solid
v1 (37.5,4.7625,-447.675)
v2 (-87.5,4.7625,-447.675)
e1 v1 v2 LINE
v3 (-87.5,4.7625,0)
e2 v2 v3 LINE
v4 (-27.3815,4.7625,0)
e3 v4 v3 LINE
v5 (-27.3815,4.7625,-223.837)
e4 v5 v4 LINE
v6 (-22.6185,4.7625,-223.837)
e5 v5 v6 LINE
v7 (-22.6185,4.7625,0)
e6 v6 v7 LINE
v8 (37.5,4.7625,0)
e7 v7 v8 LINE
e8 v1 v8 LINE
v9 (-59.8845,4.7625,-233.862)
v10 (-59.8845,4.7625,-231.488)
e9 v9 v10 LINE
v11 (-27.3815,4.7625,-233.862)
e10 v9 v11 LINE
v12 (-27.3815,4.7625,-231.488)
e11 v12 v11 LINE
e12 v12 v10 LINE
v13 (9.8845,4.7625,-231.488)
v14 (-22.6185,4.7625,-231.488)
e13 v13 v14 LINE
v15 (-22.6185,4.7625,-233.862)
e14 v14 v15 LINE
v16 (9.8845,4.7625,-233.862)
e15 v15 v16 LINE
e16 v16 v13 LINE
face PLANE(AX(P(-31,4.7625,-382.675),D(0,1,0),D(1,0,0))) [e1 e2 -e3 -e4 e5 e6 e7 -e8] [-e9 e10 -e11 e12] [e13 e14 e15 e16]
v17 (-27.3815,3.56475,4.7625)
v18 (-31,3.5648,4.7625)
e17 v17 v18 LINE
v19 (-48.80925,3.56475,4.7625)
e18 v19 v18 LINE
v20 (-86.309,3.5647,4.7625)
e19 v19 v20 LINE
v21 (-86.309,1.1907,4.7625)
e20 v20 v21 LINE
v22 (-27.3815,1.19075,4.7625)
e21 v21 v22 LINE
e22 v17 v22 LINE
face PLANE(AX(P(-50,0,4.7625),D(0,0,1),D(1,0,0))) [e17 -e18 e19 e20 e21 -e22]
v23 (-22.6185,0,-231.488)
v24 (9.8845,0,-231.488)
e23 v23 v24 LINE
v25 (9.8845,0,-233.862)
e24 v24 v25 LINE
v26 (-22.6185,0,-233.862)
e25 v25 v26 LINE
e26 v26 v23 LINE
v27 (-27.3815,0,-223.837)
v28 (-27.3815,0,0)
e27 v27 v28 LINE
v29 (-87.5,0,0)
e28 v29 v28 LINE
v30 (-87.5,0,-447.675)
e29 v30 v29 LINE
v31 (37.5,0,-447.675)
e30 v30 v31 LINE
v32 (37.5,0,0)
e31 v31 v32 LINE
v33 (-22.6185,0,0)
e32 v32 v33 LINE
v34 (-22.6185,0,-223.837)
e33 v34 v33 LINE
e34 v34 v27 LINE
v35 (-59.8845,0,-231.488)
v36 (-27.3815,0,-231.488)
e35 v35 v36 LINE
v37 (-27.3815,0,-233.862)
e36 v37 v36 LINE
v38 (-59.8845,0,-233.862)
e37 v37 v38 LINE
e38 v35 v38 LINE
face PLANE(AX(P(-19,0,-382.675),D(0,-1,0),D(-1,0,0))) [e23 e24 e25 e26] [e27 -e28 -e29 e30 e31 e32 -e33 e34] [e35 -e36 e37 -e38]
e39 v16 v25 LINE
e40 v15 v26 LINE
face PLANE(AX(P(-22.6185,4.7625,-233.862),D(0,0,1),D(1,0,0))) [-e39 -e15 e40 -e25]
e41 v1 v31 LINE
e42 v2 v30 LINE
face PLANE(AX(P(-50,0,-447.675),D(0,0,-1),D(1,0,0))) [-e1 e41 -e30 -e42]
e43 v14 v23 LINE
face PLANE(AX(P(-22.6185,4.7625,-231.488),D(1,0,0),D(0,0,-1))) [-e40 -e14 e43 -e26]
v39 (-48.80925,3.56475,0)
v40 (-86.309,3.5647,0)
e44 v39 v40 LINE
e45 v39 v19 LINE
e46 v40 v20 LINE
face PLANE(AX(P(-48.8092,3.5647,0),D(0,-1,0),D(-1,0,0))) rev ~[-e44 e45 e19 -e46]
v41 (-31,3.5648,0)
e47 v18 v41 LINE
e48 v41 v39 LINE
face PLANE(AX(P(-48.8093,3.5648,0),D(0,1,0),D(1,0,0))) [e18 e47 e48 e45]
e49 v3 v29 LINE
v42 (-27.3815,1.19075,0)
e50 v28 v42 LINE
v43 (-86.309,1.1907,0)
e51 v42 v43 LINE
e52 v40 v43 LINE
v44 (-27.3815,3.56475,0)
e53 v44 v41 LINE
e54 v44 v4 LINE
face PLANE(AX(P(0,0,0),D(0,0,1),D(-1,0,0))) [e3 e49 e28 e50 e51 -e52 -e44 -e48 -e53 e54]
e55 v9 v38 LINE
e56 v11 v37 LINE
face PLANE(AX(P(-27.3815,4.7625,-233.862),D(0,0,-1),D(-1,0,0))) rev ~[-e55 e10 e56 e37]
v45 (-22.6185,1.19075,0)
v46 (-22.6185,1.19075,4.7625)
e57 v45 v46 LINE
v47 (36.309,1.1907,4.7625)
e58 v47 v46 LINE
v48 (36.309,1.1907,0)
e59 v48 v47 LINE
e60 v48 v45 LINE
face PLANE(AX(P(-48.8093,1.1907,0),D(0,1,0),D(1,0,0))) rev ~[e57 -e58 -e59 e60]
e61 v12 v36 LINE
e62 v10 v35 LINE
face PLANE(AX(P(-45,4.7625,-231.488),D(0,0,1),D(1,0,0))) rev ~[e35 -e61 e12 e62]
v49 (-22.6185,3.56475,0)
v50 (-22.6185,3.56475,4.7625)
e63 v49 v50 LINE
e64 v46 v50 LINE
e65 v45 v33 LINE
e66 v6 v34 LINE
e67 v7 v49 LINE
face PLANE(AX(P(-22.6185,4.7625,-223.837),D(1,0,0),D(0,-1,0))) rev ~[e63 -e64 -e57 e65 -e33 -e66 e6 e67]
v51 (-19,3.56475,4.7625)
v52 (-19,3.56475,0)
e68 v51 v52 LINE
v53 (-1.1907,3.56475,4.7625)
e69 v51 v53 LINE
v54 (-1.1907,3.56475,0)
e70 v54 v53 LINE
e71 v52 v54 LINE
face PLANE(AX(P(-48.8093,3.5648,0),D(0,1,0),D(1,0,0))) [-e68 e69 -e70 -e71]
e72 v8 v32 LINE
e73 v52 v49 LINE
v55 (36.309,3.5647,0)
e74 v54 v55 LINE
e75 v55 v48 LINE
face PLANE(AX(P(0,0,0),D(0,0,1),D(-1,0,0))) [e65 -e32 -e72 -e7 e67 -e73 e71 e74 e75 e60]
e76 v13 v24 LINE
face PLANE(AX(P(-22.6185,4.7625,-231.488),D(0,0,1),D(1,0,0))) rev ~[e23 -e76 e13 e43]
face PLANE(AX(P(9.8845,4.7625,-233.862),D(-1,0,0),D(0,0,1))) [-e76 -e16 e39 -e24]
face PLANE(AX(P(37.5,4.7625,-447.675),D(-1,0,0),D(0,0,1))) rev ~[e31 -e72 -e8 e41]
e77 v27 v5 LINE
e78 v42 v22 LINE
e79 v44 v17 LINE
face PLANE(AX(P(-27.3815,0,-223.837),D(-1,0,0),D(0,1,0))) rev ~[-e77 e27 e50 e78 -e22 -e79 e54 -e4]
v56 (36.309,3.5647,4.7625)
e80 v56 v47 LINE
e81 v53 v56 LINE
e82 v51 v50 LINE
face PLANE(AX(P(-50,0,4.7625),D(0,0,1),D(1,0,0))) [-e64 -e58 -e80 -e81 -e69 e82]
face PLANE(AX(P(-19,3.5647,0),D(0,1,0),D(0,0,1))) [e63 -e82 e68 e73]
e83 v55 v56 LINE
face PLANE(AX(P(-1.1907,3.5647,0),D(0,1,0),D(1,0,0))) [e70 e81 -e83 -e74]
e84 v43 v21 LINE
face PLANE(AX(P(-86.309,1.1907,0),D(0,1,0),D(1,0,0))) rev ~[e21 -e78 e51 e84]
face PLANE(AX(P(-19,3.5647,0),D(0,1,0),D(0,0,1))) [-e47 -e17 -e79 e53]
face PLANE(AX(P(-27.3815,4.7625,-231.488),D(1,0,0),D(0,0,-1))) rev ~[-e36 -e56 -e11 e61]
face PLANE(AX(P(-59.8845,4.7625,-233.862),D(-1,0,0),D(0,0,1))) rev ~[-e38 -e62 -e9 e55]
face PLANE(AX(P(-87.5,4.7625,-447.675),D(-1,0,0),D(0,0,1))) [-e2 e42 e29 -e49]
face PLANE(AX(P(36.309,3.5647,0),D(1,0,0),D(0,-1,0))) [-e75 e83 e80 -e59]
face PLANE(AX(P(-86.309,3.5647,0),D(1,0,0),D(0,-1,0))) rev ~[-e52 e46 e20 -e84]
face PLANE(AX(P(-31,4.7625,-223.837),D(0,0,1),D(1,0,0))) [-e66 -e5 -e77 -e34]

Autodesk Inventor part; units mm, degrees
ref_plane "YZ Plane" through (0, 0, 0) normal (1, 0, 0) x (0, 1, 0)
ref_plane "XZ Plane" through (0, 0, 0) normal (0, 1, 0) x (-1, 0, 0)
ref_plane "XY Plane" through (0, 0, 0) normal (0, 0, 1) x (1, 0, 0)
sketch "Sketch1" plane through (0, 0, 0) normal (0, 1, 0) x (-1, 0, 0)
  line L0 (0, 0) -> (50, 0)
  line L1 (50, 0) -> (50, -447.675)
  line L2 (50, -447.675) -> (0, -447.675)
  line L3 (0, -447.675) -> (0, 0)
  dimension "d0" = 50
  dimension "d1" = 447.675
extrude "Extrusion1" add sketch "Sketch1" along normal blind 4.7625
sketch "Sketch2" plane through (-50, 0, 0) normal (0, 0, 1) x (1, 0, 0)
  line L0 (1.1907, 3.5648) -> (1.1907, 1.1907)
  line L1 (50, 0) -> (0, 0) projected
  line L2 (50, 4.7625) -> (0, 4.7625) projected
  line L3 (1.1907, 1.1907) -> (48.8093, 1.1907)
  line L4 (1.1907, 3.5648) -> (48.8093, 3.5648)
  line L5 (48.8093, 3.5648) -> (48.8093, 1.1907)
  line L6 (50, 0) -> (50, 4.7625) projected
extrude "Extrusion2" add sketch "Sketch2" along normal blind 4.7625
sketch "Sketch3" plane through (0, 4.7625, 0) normal (0, 1, 0) x (1, 0, 0)
  line L0 (-50, 447.675) -> (-50, 0) projected
  line L1 (-50, 447.675) -> (-25, 447.675)
  line L2 (0, 447.675) -> (-50, 447.675) projected
  line L3 (-25, 447.675) -> (-25, 382.675)
  line L4 (-31, 382.675) -> (-19, 382.675)
  line L5 (-31, 382.675) -> (-31, 0)
  line L6 (-1.1907, 0) -> (-48.8093, 0) projected
  line L7 (-19, 382.675) -> (-19, 0)
  line L8 (-31, 0) -> (-19, 0)
  point P0 (0, 0)
  dimension "d11" = 25
extrude "Extrusion3" cut sketch "Sketch3" against normal blind 10
sketch "Sketch4" plane through (-50, 0, 4.7625) normal (0, 0, 1) x (1, 0, 0)
  line L0 (31, 3.5648) -> (31, 1.1907) projected
  line L1 (31, 1.1907) -> (31, 3.5648)
  line L2 (19, 3.5648) -> (31, 3.5648) projected
  line L3 (31, 3.5648) -> (19, 3.5648)
  line L4 (19, 3.5648) -> (19, 1.1907)
  line L5 (19, 1.1907) -> (31, 1.1907)
  point P0 (50, 0)
extrude "Extrusion4" cut sketch "Sketch4" against normal blind 10
sketch "Sketch5" plane through (0, 4.7625, 0) normal (0, 1, 0) x (1, 0, 0)
  point P0 (0, 0)
sketch "Sketch6" plane through (-31, 4.7625, -382.675) normal (0, 0, 1) x (1, 0, 0)
  line L0 (12, -4.7625) -> (0, -4.7625) projected
  line L1 (12, 0) -> (12, -4.7625) projected
  line L2 (0, 0) -> (12, 0) projected
  line L3 (0, 0) -> (0, -4.7625) projected
  point P0 (31, -4.7625)
extrude "Extrusion5" add sketch "Sketch6" along normal blind 158.838
sketch "Sketch8" plane through (-31, 4.7625, -223.837) normal (0, 0, 1) x (1, 0, 0)
  line L0 (3.6185, -4.7625) -> (3.6185, 0)
  line L1 (3.6185, 0) -> (8.3815, 0)
  line L2 (8.3815, 0) -> (8.3815, -4.7625)
  line L3 (3.6185, -4.7625) -> (8.3815, -4.7625)
  line L4 (0, -4.7625) -> (12, -4.7625) projected
  line L5 (-19, 0) -> (0, 0) projected
  line L6 (0, 0) -> (3.6185, 0)
  line L7 (12, 0) -> (0, 0) projected
  line L8 (3.6185, -4.7625) -> (0, -4.7625)
  line L9 (0, -4.7625) -> (0, 0) projected
  line L10 (0, -4.7625) -> (0, 0)
  line L11 (8.3815, 0) -> (12, 0)
  line L12 (12, -3.5718) -> (12, -4.7625) projected
  line L13 (12, -4.7625) -> (8.3815, -4.7625)
  line L14 (12, -4.7625) -> (12, 0)
  point P0 (31, -4.7625)
  dimension "d25" = 4.763
extrude "Extrusion6" add sketch "Sketch8" along normal blind 223.837 contours L4 L9 L6 L0 | L2 L7 L14 L12 L4
sketch "Sketch9" plane through (-19, 1.1907, 0) normal (-1, 0, 0) x (0, 0, 1)
  line L0 (0, 2.374) -> (0, 0) projected
  line L1 (4.7625, 0) -> (0, 0) projected
  line L2 (4.7625, 2.374) -> (4.7625, 0) projected
  line L3 (0, 2.374) -> (4.7625, 2.374) projected
  point P0 (0, -1.1907)
extrude "Extrusion7" add sketch "Sketch9" along normal blind 15
sketch "Sketch10" plane through (-22.6185, 3.5648, 0) normal (0, 0, -1) x (-1, 0, 0)
  line L0 (4.763, -2.374) -> (4.763, 0) projected
  line L1 (0, 0) -> (4.763, 0) projected
  line L2 (0, 0) -> (0, -2.374) projected
  line L3 (0, -2.374) -> (4.763, -2.374) projected
  point P0 (-22.6185, -3.5648)
extrude "Extrusion8" cut sketch "Sketch10" against normal blind 15
sketch "Sketch14" plane through (0, 4.7625, 0) normal (0, 1, 0) x (1, 0, 0)
  line L0 (0, 447.675) -> (-50, 447.675) projected
  line L1 (0, 0) -> (0, 447.675) projected
  line L2 (-50, 447.675) -> (-50, 0) projected
  line L3 (-27.3815, 223.837) -> (-27.3815, 0) projected
  line L4 (-22.6185, 223.837) -> (-22.6185, 0) projected
  line L5 (-5, 231.488) -> (-22.6185, 231.488)
  line L6 (-22.6185, 231.488) -> (-22.6185, 233.862)
  line L7 (-22.6185, 233.862) -> (-5, 233.862)
  line L8 (-5, 231.488) -> (-5, 233.862)
  line L9 (-27.3815, 223.837) -> (-22.6185, 223.837) projected
  line L10 (-45, 231.488) -> (-27.3815, 231.488)
  line L11 (-27.3815, 231.488) -> (-27.3815, 233.862)
  line L12 (-27.3815, 233.862) -> (-45, 233.862)
  line L13 (-45, 231.488) -> (-45, 233.862)
  dimension "d35" = 2.374
extrude "Extrusion9" cut sketch "Sketch14" against normal blind 10
sketch "Sketch17" plane through (0, 4.7625, 0) normal (0, 1, 0) x (1, 0, 0)
  line L0 (0, 0) -> (37.5, 0)
  line L1 (0, 447.675) -> (-50, 447.675) projected
  line L2 (0, 447.675) -> (37.5, 447.675)
  line L3 (37.5, 447.675) -> (37.5, 0)
  line L4 (0, 0) -> (0, 447.675) projected
  line L5 (0, 0) -> (0, 447.675)
  line L6 (-50, 0) -> (-87.5, 0)
  line L7 (-50, 447.675) -> (-87.5, 447.675)
  line L8 (-87.5, 447.675) -> (-87.5, 0)
  line L9 (-50, 0) -> (-50, 447.675)
  dimension "d39" = 37.5
  dimension "d40" = 37.5
extrude "Extrusion10" add sketch "Sketch17" against normal up to surface (4.7625 mm away)
sketch "Sketch18" plane through (-1.1907, 1.1907, 0) normal (0, 0, 1) x (1, 0, 0)
  line L0 (37.4997, 0) -> (0, 0)
  line L1 (0, 2.374) -> (0, 0) projected
  line L2 (0, 0) -> (0, 2.374)
  line L3 (0, 2.374) -> (37.4997, 2.374)
  line L4 (37.4997, 2.374) -> (37.4997, 0)
  line L5 (38.6907, -1.1907) -> (-86.3093, -1.1907) projected
  line L6 (-21.4278, 3.5718) -> (-26.1908, 3.5718) projected
  line L7 (-85.1183, 0) -> (-47.6185, 0)
  line L8 (-47.6185, 2.374) -> (-47.6185, 0)
  line L9 (-47.6185, 2.374) -> (-85.1183, 2.374)
  line L10 (-85.1183, 2.374) -> (-85.1183, 0)
extrude "Extrusion11" add sketch "Sketch18" along normal up to surface (4.7625 mm away)
sketch "Sketch19" plane through (0, 4.7625, 0) normal (0, 1, 0) x (1, 0, 0)
  line L0 (-22.6185, 231.488) -> (9.8845, 231.488)
  line L1 (-22.6185, 233.862) -> (9.8845, 233.862)
  line L2 (9.8845, 233.862) -> (9.8845, 231.488)
  line L3 (-22.6185, 231.488) -> (-22.6185, 233.862)
  line L4 (-27.3815, 223.837) -> (-22.6185, 223.837) projected
  line L5 (-27.3815, 231.488) -> (-59.8845, 231.488)
  line L6 (-27.3815, 233.862) -> (-59.8845, 233.862)
  line L7 (-59.8845, 233.862) -> (-59.8845, 231.488)
  line L8 (-27.3815, 231.488) -> (-27.3815, 233.862)
  point P0 (0, 0)
  dimension "d47" = 32.503
extrude "Extrusion12" cut sketch "Sketch19" against normal blind 10
properties part number "Sustainable Chair_V2 - Leg(A)_1_CPY" material "Foam Board - V3"
